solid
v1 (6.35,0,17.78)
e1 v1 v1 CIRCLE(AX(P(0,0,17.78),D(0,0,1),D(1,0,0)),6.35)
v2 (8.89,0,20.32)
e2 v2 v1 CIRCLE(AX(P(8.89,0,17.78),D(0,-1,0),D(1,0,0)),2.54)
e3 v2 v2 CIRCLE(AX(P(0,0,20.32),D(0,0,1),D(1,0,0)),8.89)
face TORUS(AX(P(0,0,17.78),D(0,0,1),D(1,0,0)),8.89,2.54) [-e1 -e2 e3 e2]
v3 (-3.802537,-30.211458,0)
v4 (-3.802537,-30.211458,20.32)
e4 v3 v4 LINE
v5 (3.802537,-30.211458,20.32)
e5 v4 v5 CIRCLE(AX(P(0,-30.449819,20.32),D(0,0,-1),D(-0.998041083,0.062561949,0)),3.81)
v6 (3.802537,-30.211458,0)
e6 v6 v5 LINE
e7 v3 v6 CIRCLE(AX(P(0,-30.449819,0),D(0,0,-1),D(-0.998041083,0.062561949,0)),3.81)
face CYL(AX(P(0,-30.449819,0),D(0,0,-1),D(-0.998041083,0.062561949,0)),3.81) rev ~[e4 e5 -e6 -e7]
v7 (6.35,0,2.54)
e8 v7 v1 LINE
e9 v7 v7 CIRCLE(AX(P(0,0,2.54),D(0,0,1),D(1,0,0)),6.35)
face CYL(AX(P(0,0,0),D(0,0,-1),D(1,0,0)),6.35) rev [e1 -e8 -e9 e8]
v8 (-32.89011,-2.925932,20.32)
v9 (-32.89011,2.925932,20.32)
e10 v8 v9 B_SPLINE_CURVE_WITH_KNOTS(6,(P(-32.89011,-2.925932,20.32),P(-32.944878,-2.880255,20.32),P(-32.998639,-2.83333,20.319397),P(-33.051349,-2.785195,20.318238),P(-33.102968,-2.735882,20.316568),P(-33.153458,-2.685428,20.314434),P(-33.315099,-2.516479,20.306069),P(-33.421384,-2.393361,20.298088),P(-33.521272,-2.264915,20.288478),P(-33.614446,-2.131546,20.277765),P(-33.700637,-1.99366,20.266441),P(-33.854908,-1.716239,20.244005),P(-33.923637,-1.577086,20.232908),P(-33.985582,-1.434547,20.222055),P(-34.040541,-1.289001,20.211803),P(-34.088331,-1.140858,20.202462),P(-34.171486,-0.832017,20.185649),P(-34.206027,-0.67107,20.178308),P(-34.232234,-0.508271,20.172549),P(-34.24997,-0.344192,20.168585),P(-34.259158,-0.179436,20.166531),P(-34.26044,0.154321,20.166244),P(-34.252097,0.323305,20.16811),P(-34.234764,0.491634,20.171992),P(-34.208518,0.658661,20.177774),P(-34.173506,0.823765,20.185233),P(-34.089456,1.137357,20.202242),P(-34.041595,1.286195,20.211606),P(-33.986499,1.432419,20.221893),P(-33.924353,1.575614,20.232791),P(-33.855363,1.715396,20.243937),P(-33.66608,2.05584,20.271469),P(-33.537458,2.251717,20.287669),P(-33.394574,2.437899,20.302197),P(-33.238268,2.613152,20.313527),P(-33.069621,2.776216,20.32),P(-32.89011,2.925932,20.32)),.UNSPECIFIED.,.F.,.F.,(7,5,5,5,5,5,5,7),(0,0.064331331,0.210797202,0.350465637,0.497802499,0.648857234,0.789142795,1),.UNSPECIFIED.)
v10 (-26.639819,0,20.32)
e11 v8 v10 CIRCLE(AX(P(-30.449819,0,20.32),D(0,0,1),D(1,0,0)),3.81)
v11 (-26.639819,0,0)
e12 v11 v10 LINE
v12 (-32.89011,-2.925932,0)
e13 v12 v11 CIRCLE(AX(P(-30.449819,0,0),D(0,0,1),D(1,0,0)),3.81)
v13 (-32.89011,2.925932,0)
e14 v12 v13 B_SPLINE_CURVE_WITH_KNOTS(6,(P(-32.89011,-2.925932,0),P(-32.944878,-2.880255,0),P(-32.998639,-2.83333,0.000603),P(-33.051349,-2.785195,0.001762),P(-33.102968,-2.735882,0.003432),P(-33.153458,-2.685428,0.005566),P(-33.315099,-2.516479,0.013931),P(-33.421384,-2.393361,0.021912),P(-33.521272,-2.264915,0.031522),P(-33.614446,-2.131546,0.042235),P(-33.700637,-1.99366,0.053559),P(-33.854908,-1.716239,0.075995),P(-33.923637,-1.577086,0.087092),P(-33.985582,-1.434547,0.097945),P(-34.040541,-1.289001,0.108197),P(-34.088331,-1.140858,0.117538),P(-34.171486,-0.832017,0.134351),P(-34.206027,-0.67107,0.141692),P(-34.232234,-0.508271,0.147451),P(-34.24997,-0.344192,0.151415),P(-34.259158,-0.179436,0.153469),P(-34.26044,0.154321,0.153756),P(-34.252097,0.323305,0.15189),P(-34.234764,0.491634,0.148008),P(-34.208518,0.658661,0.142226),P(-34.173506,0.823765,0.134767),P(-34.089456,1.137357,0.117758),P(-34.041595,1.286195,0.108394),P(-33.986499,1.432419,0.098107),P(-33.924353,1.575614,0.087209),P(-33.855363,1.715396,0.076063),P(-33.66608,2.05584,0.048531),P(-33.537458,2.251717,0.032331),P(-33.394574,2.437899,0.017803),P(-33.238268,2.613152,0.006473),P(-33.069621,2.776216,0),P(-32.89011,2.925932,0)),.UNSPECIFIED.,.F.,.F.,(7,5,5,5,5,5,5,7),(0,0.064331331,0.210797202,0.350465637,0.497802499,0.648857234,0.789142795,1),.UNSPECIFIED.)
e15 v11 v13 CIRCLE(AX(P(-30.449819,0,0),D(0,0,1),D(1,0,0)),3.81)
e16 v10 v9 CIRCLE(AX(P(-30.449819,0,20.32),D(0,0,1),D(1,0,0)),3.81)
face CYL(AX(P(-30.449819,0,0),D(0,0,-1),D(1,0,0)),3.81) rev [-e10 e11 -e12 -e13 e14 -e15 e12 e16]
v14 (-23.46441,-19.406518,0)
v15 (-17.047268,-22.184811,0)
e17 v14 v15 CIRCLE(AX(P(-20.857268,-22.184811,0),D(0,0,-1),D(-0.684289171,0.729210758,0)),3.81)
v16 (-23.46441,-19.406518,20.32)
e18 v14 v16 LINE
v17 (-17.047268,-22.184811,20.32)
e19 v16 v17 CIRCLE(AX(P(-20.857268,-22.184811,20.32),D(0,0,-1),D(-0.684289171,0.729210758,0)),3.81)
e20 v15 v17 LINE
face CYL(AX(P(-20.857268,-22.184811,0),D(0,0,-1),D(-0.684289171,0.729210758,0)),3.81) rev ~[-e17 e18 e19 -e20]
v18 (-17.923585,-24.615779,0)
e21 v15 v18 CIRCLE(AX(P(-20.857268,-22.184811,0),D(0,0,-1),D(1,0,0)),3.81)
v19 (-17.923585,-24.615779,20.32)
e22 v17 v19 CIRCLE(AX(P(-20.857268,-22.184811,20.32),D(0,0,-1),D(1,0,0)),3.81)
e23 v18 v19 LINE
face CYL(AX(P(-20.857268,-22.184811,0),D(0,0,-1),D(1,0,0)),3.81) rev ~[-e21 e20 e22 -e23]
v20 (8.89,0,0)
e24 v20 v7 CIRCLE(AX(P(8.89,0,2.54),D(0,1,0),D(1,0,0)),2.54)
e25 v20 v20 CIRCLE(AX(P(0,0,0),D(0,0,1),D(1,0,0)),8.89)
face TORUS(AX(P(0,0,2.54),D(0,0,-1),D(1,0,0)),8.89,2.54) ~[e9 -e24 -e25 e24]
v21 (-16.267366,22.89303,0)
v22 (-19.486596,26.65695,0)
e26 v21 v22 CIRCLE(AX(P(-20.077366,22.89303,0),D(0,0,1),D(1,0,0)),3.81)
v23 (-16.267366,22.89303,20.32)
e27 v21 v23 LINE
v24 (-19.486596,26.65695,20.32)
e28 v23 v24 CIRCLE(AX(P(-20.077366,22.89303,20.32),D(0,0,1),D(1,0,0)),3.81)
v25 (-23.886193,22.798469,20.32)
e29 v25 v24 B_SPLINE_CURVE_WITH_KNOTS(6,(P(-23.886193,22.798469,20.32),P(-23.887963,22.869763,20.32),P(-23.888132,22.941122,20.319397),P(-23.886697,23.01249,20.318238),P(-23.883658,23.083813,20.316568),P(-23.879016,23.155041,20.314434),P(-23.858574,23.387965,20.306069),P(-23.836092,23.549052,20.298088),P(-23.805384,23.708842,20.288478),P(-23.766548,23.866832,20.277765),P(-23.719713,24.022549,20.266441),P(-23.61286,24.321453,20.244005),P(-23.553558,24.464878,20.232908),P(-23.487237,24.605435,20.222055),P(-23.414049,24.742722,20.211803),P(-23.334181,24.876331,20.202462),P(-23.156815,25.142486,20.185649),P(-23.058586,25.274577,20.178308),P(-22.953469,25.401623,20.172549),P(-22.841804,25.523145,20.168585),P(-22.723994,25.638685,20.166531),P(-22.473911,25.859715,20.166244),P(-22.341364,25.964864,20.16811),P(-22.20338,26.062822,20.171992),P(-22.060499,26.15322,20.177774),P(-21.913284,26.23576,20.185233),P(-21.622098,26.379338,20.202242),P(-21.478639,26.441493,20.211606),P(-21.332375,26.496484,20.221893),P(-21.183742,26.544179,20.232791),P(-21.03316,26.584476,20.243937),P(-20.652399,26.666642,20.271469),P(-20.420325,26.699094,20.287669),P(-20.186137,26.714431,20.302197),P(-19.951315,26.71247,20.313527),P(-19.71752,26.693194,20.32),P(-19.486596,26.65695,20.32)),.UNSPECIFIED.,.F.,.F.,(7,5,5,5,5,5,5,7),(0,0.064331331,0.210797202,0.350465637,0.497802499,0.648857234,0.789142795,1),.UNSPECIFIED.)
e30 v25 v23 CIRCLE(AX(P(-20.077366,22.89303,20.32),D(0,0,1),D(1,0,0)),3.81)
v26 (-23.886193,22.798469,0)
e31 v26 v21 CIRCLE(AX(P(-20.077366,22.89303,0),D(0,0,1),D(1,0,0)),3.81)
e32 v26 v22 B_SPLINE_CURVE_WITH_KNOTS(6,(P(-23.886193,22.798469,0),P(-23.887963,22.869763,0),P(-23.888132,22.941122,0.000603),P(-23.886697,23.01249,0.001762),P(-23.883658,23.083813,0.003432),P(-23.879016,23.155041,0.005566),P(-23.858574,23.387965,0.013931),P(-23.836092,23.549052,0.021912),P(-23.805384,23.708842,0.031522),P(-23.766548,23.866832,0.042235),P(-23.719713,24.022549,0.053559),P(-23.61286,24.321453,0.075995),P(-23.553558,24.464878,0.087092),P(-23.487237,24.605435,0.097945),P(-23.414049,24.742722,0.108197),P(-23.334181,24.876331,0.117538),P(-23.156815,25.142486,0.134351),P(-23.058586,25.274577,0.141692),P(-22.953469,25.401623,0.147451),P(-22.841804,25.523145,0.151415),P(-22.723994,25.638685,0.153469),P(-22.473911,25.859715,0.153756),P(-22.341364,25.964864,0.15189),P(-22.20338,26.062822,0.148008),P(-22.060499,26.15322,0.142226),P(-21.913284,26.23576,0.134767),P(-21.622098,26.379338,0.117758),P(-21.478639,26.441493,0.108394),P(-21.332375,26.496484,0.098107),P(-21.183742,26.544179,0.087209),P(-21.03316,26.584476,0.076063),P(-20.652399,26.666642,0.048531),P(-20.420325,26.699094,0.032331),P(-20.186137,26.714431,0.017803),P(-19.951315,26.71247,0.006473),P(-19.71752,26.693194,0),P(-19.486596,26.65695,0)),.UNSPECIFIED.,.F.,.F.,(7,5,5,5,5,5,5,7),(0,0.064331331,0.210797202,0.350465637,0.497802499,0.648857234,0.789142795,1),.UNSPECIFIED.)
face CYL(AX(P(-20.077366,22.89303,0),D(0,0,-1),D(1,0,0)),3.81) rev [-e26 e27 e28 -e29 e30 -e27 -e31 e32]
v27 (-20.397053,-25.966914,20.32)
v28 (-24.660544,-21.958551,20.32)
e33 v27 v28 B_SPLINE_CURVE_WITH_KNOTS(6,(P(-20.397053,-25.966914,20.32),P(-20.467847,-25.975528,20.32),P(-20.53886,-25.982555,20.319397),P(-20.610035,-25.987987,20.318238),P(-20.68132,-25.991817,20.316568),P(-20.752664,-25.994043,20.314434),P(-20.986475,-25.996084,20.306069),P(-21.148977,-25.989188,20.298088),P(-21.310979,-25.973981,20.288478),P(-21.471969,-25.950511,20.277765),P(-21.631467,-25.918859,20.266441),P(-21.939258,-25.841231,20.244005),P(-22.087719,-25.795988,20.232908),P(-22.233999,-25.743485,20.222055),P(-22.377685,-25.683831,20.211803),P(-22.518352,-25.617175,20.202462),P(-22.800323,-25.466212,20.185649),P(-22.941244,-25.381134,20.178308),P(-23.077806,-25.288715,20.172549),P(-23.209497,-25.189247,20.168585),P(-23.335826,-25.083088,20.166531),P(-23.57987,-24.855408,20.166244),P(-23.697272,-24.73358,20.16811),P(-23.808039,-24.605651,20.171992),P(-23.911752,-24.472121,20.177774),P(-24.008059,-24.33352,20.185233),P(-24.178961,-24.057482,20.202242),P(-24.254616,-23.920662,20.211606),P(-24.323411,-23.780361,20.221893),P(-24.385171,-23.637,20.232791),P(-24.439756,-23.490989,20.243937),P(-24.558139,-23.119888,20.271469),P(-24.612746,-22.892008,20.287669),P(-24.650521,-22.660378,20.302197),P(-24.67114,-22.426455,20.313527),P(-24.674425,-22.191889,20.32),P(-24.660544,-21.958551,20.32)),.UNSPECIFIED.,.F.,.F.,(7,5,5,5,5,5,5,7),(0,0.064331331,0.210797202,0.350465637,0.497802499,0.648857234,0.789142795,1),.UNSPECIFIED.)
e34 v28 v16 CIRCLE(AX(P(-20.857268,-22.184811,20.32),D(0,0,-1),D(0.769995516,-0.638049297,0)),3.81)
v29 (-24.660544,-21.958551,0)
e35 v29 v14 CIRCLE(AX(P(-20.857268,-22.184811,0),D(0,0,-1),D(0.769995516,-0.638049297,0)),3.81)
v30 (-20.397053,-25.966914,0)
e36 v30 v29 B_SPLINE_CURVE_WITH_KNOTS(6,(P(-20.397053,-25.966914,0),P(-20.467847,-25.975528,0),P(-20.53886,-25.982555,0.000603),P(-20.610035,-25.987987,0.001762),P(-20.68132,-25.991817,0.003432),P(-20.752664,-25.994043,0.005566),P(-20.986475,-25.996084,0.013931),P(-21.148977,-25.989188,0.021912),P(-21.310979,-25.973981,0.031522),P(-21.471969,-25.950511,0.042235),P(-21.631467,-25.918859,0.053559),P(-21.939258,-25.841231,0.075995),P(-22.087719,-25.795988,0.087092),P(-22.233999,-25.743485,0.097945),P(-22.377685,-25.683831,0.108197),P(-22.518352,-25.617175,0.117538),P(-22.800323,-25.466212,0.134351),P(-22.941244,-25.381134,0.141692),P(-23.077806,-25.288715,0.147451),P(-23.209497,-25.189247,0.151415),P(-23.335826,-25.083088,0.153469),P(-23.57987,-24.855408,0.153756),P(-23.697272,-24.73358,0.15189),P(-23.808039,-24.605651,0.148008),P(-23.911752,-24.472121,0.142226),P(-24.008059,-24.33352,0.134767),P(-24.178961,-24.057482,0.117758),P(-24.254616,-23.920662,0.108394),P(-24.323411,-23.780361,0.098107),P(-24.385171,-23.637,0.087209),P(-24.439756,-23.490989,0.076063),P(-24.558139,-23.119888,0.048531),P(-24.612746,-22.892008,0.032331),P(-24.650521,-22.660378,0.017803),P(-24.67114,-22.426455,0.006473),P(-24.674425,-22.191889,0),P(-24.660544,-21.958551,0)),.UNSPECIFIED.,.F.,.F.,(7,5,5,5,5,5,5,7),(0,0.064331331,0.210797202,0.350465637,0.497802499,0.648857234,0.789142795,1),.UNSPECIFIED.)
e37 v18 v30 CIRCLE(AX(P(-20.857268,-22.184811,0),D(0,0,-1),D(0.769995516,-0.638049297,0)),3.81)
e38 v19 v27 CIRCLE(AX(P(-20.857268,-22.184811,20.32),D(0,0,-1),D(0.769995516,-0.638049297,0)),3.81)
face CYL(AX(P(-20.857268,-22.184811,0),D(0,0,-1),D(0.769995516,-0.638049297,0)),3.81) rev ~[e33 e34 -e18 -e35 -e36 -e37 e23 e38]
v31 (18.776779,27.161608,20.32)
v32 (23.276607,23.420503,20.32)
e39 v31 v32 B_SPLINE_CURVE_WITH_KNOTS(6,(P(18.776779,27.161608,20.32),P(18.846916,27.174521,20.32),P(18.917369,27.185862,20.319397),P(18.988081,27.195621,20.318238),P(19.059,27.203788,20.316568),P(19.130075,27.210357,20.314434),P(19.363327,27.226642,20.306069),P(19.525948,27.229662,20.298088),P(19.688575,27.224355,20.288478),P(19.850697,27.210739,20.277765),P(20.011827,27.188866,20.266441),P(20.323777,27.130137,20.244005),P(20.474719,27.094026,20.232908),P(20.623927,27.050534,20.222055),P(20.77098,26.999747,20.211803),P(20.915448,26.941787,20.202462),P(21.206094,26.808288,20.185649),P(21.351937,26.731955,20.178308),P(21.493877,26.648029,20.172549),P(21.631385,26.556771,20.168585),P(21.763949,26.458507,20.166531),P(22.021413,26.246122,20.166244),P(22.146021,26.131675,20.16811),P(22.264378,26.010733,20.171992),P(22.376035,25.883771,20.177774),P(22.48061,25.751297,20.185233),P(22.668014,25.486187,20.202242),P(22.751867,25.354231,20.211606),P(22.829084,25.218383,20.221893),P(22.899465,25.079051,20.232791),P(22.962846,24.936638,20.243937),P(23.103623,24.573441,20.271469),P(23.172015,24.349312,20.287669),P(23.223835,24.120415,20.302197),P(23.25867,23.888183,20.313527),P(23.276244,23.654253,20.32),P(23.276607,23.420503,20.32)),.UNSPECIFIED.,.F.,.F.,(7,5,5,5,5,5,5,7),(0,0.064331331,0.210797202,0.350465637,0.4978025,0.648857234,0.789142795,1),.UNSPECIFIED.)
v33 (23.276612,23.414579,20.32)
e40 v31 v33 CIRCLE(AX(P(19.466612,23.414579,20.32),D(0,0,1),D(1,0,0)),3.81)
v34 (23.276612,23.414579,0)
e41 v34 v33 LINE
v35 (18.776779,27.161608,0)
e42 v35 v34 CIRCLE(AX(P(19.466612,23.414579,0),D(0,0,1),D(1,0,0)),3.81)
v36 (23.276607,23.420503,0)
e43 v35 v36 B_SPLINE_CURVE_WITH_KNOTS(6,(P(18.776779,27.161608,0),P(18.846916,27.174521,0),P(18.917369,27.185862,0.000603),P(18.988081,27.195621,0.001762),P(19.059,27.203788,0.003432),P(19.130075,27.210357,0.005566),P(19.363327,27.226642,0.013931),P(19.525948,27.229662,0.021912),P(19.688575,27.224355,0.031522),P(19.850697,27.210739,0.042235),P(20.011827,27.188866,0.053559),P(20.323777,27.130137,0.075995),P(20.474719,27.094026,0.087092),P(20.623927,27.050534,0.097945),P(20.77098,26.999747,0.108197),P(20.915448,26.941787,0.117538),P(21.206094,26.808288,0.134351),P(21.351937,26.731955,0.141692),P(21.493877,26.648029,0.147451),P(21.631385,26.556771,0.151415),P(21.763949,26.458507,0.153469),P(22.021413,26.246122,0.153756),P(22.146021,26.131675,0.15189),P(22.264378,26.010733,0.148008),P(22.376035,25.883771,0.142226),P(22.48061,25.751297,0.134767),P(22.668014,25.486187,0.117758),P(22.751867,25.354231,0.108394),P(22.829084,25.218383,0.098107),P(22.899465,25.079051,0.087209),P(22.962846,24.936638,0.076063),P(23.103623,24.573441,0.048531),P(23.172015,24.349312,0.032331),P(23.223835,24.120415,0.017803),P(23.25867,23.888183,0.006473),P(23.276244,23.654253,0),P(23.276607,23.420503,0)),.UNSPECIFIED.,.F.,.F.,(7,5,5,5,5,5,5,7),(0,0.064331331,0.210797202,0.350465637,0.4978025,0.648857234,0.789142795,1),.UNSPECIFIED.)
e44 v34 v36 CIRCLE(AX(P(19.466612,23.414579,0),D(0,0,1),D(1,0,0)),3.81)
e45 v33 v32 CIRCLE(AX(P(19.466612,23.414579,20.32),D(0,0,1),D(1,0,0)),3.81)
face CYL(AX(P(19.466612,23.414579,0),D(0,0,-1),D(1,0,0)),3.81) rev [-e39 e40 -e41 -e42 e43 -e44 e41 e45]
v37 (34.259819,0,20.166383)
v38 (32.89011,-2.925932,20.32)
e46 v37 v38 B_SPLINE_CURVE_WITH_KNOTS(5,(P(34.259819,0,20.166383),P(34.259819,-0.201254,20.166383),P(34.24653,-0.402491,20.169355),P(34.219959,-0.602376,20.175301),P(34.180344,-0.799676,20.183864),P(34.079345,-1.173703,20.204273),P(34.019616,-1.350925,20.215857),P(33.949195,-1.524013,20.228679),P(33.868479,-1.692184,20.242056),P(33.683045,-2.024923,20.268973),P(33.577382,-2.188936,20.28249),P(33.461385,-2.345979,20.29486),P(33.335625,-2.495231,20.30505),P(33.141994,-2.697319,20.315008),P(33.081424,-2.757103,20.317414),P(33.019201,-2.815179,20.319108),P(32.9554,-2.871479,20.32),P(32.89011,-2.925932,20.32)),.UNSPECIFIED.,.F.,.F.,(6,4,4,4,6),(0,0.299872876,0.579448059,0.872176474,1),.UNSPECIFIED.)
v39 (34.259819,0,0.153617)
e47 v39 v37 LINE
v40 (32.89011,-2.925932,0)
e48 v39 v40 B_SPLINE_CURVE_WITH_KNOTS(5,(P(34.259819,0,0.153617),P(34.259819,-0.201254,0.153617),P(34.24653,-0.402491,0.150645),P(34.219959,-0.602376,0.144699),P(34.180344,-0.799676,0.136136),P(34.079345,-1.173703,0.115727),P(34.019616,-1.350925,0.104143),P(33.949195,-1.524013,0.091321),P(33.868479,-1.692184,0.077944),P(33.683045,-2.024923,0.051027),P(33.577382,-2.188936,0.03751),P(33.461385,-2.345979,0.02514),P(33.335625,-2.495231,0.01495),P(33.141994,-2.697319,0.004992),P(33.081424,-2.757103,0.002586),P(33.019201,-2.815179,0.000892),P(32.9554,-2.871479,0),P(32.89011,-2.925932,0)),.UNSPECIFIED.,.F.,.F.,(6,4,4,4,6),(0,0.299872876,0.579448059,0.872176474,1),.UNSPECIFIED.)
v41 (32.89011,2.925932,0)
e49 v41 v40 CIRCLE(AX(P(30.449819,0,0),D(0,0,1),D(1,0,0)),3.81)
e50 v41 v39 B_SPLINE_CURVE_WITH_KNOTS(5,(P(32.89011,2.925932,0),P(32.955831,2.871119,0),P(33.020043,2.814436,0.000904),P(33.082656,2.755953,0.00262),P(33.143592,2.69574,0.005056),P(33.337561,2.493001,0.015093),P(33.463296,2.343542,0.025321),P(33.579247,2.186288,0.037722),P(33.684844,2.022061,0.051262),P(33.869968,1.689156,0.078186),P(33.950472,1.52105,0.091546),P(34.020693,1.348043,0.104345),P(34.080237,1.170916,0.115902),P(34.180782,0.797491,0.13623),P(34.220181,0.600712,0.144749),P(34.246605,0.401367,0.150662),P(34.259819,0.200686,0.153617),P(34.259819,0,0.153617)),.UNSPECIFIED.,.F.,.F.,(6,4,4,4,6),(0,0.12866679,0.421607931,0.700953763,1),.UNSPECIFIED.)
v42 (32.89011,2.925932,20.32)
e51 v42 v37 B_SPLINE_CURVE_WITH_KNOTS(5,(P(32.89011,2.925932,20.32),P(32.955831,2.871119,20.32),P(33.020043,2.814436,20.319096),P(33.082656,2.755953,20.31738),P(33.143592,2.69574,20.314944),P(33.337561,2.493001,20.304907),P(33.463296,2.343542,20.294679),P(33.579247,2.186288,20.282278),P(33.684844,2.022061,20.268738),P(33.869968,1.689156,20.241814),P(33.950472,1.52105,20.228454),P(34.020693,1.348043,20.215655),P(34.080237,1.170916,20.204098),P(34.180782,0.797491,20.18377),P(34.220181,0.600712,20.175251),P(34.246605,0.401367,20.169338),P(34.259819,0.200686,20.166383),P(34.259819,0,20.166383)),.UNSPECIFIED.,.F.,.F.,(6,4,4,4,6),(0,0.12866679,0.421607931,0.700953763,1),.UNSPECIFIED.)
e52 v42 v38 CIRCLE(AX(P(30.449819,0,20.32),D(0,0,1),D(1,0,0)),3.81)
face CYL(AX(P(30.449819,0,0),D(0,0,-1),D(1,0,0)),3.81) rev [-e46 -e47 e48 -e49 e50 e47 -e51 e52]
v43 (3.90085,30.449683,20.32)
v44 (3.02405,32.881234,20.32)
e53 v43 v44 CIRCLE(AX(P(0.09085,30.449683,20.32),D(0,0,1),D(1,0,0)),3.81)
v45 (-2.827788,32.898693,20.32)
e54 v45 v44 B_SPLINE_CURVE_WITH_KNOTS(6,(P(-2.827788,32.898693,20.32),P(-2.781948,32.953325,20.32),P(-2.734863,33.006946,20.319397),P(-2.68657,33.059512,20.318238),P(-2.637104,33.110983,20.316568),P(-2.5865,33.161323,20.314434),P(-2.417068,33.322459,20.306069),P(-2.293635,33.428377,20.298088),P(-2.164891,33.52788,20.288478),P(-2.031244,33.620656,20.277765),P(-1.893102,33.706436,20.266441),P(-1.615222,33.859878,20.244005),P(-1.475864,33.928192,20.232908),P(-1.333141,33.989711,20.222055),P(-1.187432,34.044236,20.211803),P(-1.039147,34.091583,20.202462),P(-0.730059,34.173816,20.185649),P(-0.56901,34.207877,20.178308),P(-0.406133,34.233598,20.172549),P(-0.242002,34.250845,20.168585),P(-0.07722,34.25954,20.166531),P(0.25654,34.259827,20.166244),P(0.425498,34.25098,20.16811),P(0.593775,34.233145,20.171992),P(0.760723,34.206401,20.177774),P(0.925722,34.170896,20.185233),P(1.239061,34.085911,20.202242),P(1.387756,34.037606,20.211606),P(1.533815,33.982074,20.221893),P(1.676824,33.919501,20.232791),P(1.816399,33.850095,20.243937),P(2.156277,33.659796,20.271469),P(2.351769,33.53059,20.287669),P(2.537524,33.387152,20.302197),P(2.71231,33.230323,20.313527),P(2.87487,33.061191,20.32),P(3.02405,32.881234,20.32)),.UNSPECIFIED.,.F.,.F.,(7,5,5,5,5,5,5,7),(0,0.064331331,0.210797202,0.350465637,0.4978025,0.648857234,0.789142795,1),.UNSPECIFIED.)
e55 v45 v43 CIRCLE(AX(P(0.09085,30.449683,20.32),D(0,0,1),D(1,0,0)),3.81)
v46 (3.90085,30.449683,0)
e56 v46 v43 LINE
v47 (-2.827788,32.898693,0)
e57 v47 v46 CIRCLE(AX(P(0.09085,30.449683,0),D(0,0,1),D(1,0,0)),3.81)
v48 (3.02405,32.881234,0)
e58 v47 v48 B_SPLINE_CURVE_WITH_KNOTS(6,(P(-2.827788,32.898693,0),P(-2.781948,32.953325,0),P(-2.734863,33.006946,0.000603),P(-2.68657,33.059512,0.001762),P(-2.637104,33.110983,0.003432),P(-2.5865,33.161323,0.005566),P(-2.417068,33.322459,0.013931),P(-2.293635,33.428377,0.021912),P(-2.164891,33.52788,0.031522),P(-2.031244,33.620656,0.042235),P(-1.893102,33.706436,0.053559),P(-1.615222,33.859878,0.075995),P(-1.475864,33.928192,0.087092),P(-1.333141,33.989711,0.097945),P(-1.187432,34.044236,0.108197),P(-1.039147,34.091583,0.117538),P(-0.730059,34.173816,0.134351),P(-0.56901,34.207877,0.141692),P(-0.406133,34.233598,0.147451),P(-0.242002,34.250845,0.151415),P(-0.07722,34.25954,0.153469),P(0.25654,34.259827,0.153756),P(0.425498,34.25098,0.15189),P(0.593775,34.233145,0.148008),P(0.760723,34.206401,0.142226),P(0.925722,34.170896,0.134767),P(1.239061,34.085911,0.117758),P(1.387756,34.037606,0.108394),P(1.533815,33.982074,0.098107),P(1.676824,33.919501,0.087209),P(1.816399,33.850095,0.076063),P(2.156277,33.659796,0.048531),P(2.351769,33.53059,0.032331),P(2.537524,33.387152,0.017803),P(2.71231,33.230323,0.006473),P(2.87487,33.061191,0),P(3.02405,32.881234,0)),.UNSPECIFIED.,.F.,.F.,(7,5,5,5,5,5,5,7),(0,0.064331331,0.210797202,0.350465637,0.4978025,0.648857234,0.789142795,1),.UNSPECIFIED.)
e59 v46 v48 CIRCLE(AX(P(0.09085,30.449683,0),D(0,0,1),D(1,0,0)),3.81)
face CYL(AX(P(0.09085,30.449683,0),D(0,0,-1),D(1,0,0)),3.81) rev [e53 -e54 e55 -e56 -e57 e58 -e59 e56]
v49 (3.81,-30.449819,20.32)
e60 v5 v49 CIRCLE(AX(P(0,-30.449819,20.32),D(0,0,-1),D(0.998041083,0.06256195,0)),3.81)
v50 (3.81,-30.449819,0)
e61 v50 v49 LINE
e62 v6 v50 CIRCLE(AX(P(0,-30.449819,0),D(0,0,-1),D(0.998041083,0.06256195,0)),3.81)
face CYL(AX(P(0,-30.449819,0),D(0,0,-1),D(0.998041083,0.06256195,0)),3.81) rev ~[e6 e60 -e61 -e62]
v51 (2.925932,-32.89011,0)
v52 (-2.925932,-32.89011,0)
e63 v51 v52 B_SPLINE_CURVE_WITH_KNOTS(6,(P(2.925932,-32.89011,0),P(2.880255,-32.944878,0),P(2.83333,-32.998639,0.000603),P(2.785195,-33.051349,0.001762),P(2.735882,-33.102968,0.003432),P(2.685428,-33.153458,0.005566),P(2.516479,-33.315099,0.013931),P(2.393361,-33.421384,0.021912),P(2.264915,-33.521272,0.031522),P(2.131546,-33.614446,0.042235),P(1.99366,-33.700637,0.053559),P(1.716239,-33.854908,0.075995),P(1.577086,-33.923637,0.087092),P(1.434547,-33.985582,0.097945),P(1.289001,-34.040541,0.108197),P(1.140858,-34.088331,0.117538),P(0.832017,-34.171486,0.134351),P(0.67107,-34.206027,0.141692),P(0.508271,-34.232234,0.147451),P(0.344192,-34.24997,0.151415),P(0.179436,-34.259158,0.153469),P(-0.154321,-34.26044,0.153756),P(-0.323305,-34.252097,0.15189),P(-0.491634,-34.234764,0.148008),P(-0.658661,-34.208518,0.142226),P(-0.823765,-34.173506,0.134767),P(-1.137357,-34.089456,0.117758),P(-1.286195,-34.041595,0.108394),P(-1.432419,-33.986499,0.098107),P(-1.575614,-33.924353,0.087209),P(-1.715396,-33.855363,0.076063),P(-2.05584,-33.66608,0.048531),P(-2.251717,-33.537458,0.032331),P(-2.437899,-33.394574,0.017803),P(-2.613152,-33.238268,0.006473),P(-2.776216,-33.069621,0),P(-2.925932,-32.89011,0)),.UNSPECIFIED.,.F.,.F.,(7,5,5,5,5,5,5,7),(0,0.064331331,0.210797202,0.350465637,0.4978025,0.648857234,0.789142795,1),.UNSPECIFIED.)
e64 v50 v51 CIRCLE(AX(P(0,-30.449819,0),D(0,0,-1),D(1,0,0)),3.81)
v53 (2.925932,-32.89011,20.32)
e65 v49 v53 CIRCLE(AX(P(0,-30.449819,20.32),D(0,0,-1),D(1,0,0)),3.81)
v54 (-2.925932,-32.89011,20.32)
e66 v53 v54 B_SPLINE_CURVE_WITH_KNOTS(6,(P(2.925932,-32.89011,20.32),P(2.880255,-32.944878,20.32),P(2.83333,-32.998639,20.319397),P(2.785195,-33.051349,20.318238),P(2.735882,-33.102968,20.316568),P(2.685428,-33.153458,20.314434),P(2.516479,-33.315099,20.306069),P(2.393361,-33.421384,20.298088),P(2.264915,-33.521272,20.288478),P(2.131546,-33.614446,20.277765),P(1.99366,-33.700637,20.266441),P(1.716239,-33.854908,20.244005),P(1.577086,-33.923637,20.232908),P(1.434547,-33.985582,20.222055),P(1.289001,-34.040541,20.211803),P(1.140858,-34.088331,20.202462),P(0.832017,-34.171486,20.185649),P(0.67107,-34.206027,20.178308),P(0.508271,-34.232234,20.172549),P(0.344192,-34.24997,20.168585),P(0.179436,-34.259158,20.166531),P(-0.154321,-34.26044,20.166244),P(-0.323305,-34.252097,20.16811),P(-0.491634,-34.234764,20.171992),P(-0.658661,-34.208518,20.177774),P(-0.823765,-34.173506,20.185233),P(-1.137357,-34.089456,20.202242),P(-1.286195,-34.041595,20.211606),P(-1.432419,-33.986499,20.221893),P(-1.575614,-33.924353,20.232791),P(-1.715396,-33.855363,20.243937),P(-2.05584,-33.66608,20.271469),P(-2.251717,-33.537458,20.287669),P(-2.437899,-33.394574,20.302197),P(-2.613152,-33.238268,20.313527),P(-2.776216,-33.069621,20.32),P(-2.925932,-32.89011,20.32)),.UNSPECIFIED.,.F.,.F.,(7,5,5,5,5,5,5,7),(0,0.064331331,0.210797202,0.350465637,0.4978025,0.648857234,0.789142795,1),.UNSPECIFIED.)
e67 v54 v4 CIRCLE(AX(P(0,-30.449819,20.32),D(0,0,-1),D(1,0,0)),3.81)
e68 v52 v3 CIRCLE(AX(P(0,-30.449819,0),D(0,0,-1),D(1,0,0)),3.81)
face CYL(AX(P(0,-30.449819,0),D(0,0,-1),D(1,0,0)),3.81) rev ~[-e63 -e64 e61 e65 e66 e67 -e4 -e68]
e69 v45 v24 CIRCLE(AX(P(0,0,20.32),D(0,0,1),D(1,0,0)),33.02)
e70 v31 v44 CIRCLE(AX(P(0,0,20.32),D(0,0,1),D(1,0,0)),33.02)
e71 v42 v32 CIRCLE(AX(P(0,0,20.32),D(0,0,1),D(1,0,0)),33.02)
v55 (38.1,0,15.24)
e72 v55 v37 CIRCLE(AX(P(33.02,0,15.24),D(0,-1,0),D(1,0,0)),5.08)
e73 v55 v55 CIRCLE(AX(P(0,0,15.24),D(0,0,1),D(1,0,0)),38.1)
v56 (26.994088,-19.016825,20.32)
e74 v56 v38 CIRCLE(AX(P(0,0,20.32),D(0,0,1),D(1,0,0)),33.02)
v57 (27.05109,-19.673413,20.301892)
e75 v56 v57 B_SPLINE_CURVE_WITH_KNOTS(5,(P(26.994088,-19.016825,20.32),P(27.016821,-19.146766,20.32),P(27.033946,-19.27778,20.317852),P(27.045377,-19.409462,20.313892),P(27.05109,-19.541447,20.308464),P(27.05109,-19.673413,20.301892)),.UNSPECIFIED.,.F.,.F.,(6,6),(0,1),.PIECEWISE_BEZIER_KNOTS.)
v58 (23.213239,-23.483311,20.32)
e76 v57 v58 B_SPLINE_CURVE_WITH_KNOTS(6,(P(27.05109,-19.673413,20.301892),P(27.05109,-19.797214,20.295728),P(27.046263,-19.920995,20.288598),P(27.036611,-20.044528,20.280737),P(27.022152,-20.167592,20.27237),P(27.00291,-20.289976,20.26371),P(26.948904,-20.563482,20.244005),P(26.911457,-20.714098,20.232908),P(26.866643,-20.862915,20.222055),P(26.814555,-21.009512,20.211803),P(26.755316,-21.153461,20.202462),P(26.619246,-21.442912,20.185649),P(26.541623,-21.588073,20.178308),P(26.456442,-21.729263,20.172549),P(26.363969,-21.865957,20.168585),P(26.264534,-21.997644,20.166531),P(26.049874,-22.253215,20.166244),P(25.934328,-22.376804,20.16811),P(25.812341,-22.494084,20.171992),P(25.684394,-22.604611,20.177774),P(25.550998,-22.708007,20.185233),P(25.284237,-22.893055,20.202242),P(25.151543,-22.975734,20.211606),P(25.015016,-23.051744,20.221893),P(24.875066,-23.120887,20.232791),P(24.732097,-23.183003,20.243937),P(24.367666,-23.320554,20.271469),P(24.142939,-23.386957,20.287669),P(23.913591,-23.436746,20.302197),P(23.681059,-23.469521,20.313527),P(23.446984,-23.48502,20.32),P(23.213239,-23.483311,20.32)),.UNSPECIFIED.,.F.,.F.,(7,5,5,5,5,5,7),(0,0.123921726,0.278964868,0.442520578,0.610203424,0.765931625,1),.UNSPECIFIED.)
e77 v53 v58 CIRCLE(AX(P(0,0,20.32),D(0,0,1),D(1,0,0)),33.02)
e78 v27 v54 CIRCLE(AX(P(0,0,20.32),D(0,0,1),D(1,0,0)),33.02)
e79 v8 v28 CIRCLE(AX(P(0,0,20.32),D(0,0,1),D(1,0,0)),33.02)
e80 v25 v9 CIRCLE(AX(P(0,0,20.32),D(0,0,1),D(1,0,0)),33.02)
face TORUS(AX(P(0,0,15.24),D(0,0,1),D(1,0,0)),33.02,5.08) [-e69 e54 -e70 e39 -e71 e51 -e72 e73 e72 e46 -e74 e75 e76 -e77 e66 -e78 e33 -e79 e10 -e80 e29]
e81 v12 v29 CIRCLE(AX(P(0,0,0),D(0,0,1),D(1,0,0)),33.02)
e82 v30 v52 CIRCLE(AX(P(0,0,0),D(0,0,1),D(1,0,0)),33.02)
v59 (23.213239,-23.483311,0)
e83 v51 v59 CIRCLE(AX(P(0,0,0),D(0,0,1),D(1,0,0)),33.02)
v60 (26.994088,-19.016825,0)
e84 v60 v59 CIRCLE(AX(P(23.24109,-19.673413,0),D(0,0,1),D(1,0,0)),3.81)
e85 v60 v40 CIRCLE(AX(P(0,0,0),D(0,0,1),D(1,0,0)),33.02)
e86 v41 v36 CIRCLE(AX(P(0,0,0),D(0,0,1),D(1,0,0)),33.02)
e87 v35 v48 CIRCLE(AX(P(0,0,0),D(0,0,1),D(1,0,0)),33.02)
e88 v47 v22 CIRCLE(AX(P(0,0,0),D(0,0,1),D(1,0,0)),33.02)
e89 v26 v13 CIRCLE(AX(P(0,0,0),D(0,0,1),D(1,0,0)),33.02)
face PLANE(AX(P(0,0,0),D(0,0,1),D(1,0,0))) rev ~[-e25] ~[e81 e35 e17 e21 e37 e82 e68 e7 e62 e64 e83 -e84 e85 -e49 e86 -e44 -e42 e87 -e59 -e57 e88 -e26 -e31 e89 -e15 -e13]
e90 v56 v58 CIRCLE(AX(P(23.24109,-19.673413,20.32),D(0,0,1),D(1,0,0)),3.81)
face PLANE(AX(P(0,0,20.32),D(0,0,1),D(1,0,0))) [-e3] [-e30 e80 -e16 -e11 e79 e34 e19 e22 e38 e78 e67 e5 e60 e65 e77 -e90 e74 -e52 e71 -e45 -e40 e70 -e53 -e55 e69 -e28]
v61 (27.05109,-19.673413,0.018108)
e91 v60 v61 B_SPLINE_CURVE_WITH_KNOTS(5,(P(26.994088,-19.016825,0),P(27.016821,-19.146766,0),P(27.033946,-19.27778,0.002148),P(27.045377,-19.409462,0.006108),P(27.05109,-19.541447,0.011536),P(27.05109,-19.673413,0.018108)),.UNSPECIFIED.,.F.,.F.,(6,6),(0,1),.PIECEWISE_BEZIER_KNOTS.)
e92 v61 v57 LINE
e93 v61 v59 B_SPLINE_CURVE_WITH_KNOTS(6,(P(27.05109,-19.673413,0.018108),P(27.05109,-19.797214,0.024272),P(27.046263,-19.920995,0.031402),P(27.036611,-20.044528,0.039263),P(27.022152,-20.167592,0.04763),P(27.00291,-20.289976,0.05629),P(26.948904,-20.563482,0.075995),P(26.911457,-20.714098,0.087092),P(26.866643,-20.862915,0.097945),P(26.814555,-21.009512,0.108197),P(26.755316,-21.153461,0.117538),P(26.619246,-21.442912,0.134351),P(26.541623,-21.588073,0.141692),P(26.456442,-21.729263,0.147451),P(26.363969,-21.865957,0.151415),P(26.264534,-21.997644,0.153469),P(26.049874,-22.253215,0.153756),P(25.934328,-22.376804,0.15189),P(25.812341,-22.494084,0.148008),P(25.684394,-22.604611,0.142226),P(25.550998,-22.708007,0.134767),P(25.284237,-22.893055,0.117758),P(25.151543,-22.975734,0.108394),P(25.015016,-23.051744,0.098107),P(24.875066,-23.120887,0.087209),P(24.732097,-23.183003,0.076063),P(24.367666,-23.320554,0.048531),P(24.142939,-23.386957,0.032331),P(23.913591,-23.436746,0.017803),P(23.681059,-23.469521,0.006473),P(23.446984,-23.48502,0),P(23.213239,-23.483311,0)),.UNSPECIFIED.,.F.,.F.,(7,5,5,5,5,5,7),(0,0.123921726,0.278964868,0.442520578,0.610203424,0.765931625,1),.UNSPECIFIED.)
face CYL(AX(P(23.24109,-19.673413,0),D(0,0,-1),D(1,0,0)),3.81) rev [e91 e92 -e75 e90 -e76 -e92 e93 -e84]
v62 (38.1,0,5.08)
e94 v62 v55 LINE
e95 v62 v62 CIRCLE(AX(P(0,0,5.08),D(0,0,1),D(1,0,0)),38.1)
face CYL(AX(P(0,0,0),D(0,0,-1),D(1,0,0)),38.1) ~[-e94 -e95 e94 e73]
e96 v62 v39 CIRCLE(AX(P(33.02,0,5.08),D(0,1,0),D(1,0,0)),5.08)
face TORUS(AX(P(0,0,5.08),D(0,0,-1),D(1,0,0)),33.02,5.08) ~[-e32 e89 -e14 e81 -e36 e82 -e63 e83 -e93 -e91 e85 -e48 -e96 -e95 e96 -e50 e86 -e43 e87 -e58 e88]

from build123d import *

# Parameters (mm, degrees)
F0_R     = 38.1
F0_R_2   = 3.81
F0_R_3   = 6.35
F1_DEPTH = 20.32
F3_R     = 2.54


# Not quite as in the source:
# - a fillet or chamfer that OpenCascade refuses, or shapes differently, is made with other operations: its cross-section is extruded or revolved along the edge and cut away or added


with BuildPart() as f1:
    # F0 (on Top) → F1 (new body)
    with BuildSketch(Plane.XY):
        Circle(F0_R)
        with BuildLine():
            ThreePointArc((-23.4644098568, -19.406517819), (-19.3435161595, -18.6884333945), (-17.0472681142, -22.1848108083))
            ThreePointArc((-17.0472681142, -22.1848108083), (-17.2730365429, -23.4768572636), (-17.923585197, -24.6157786282))
            ThreePointArc((-17.923585197, -24.6157786282), (-23.4670107891, -24.960660799), (-23.4644098568, -19.406517819))
        make_face(mode=Mode.SUBTRACT)
        with BuildLine():
            ThreePointArc((3.8025365247, -30.2114577564), (3.8081336741, -30.3305798595), (3.81, -30.4498187809))
            ThreePointArc((3.81, -30.4498187809), (-0.1192389213, -34.2579524549), (-3.8025365247, -30.2114577564))
            ThreePointArc((-3.8025365247, -30.2114577564), (0, -26.6398187809), (3.8025365247, -30.2114577564))
        make_face(mode=Mode.SUBTRACT)
        with Locations((23.2410902589, -19.6734132108)):
            Circle(F0_R_2, mode=Mode.SUBTRACT)
        with Locations((-30.4498187809, 0)):
            Circle(F0_R_2, mode=Mode.SUBTRACT)
        with Locations((-20.0773663918, 22.8930299995)):
            Circle(F0_R_2, mode=Mode.SUBTRACT)
        Circle(F0_R_3, mode=Mode.SUBTRACT)
        with Locations((30.4498187809, 0)):
            Circle(F0_R_2, mode=Mode.SUBTRACT)
        with Locations((0.0908500673, 30.4496832504)):
            Circle(F0_R_2, mode=Mode.SUBTRACT)
        with Locations((19.4666116643, 23.4145786658)):
            Circle(F0_R_2, mode=Mode.SUBTRACT)
    extrude(amount=F1_DEPTH)

    # F2: fillet of radius 5.08 on 2 edges, made by hand

    # F2_s1 → F2_t2 (revolve, cut)
    with BuildSketch(Plane.XZ):
        with BuildLine():
            ThreePointArc((38.1, 15.24), (36.6121024484, 18.8321024484), (33.02, 20.32))
            Line((33.02, 20.32), (38.1, 20.32))
            Line((38.1, 20.32), (38.1, 15.24))
        make_face()
    revolve(axis=Axis((0, 0, 20.32), (0, 0, 1)), mode=Mode.SUBTRACT)

    # F2_s3 → F2_t4 (revolve, cut)
    with BuildSketch(Plane.XZ):
        with BuildLine():
            ThreePointArc((38.1, 5.08), (36.6121024484, 1.4878975516), (33.02, 0))
            Line((33.02, 0), (38.1, 0))
            Line((38.1, 0), (38.1, 5.08))
        make_face()
    revolve(axis=Axis((0, 0, 0), (0, 0, 1)), mode=Mode.SUBTRACT)

    # F3
    f3_edges = [f1.edges().sort_by_distance(p)[0] for p in [
        (6.35, 0, 10.16),
        (-6.35, 0, 0),
        (-6.35, 0, 20.32),
    ]]
    fillet(f3_edges, radius=F3_R)


solid = f1.part
